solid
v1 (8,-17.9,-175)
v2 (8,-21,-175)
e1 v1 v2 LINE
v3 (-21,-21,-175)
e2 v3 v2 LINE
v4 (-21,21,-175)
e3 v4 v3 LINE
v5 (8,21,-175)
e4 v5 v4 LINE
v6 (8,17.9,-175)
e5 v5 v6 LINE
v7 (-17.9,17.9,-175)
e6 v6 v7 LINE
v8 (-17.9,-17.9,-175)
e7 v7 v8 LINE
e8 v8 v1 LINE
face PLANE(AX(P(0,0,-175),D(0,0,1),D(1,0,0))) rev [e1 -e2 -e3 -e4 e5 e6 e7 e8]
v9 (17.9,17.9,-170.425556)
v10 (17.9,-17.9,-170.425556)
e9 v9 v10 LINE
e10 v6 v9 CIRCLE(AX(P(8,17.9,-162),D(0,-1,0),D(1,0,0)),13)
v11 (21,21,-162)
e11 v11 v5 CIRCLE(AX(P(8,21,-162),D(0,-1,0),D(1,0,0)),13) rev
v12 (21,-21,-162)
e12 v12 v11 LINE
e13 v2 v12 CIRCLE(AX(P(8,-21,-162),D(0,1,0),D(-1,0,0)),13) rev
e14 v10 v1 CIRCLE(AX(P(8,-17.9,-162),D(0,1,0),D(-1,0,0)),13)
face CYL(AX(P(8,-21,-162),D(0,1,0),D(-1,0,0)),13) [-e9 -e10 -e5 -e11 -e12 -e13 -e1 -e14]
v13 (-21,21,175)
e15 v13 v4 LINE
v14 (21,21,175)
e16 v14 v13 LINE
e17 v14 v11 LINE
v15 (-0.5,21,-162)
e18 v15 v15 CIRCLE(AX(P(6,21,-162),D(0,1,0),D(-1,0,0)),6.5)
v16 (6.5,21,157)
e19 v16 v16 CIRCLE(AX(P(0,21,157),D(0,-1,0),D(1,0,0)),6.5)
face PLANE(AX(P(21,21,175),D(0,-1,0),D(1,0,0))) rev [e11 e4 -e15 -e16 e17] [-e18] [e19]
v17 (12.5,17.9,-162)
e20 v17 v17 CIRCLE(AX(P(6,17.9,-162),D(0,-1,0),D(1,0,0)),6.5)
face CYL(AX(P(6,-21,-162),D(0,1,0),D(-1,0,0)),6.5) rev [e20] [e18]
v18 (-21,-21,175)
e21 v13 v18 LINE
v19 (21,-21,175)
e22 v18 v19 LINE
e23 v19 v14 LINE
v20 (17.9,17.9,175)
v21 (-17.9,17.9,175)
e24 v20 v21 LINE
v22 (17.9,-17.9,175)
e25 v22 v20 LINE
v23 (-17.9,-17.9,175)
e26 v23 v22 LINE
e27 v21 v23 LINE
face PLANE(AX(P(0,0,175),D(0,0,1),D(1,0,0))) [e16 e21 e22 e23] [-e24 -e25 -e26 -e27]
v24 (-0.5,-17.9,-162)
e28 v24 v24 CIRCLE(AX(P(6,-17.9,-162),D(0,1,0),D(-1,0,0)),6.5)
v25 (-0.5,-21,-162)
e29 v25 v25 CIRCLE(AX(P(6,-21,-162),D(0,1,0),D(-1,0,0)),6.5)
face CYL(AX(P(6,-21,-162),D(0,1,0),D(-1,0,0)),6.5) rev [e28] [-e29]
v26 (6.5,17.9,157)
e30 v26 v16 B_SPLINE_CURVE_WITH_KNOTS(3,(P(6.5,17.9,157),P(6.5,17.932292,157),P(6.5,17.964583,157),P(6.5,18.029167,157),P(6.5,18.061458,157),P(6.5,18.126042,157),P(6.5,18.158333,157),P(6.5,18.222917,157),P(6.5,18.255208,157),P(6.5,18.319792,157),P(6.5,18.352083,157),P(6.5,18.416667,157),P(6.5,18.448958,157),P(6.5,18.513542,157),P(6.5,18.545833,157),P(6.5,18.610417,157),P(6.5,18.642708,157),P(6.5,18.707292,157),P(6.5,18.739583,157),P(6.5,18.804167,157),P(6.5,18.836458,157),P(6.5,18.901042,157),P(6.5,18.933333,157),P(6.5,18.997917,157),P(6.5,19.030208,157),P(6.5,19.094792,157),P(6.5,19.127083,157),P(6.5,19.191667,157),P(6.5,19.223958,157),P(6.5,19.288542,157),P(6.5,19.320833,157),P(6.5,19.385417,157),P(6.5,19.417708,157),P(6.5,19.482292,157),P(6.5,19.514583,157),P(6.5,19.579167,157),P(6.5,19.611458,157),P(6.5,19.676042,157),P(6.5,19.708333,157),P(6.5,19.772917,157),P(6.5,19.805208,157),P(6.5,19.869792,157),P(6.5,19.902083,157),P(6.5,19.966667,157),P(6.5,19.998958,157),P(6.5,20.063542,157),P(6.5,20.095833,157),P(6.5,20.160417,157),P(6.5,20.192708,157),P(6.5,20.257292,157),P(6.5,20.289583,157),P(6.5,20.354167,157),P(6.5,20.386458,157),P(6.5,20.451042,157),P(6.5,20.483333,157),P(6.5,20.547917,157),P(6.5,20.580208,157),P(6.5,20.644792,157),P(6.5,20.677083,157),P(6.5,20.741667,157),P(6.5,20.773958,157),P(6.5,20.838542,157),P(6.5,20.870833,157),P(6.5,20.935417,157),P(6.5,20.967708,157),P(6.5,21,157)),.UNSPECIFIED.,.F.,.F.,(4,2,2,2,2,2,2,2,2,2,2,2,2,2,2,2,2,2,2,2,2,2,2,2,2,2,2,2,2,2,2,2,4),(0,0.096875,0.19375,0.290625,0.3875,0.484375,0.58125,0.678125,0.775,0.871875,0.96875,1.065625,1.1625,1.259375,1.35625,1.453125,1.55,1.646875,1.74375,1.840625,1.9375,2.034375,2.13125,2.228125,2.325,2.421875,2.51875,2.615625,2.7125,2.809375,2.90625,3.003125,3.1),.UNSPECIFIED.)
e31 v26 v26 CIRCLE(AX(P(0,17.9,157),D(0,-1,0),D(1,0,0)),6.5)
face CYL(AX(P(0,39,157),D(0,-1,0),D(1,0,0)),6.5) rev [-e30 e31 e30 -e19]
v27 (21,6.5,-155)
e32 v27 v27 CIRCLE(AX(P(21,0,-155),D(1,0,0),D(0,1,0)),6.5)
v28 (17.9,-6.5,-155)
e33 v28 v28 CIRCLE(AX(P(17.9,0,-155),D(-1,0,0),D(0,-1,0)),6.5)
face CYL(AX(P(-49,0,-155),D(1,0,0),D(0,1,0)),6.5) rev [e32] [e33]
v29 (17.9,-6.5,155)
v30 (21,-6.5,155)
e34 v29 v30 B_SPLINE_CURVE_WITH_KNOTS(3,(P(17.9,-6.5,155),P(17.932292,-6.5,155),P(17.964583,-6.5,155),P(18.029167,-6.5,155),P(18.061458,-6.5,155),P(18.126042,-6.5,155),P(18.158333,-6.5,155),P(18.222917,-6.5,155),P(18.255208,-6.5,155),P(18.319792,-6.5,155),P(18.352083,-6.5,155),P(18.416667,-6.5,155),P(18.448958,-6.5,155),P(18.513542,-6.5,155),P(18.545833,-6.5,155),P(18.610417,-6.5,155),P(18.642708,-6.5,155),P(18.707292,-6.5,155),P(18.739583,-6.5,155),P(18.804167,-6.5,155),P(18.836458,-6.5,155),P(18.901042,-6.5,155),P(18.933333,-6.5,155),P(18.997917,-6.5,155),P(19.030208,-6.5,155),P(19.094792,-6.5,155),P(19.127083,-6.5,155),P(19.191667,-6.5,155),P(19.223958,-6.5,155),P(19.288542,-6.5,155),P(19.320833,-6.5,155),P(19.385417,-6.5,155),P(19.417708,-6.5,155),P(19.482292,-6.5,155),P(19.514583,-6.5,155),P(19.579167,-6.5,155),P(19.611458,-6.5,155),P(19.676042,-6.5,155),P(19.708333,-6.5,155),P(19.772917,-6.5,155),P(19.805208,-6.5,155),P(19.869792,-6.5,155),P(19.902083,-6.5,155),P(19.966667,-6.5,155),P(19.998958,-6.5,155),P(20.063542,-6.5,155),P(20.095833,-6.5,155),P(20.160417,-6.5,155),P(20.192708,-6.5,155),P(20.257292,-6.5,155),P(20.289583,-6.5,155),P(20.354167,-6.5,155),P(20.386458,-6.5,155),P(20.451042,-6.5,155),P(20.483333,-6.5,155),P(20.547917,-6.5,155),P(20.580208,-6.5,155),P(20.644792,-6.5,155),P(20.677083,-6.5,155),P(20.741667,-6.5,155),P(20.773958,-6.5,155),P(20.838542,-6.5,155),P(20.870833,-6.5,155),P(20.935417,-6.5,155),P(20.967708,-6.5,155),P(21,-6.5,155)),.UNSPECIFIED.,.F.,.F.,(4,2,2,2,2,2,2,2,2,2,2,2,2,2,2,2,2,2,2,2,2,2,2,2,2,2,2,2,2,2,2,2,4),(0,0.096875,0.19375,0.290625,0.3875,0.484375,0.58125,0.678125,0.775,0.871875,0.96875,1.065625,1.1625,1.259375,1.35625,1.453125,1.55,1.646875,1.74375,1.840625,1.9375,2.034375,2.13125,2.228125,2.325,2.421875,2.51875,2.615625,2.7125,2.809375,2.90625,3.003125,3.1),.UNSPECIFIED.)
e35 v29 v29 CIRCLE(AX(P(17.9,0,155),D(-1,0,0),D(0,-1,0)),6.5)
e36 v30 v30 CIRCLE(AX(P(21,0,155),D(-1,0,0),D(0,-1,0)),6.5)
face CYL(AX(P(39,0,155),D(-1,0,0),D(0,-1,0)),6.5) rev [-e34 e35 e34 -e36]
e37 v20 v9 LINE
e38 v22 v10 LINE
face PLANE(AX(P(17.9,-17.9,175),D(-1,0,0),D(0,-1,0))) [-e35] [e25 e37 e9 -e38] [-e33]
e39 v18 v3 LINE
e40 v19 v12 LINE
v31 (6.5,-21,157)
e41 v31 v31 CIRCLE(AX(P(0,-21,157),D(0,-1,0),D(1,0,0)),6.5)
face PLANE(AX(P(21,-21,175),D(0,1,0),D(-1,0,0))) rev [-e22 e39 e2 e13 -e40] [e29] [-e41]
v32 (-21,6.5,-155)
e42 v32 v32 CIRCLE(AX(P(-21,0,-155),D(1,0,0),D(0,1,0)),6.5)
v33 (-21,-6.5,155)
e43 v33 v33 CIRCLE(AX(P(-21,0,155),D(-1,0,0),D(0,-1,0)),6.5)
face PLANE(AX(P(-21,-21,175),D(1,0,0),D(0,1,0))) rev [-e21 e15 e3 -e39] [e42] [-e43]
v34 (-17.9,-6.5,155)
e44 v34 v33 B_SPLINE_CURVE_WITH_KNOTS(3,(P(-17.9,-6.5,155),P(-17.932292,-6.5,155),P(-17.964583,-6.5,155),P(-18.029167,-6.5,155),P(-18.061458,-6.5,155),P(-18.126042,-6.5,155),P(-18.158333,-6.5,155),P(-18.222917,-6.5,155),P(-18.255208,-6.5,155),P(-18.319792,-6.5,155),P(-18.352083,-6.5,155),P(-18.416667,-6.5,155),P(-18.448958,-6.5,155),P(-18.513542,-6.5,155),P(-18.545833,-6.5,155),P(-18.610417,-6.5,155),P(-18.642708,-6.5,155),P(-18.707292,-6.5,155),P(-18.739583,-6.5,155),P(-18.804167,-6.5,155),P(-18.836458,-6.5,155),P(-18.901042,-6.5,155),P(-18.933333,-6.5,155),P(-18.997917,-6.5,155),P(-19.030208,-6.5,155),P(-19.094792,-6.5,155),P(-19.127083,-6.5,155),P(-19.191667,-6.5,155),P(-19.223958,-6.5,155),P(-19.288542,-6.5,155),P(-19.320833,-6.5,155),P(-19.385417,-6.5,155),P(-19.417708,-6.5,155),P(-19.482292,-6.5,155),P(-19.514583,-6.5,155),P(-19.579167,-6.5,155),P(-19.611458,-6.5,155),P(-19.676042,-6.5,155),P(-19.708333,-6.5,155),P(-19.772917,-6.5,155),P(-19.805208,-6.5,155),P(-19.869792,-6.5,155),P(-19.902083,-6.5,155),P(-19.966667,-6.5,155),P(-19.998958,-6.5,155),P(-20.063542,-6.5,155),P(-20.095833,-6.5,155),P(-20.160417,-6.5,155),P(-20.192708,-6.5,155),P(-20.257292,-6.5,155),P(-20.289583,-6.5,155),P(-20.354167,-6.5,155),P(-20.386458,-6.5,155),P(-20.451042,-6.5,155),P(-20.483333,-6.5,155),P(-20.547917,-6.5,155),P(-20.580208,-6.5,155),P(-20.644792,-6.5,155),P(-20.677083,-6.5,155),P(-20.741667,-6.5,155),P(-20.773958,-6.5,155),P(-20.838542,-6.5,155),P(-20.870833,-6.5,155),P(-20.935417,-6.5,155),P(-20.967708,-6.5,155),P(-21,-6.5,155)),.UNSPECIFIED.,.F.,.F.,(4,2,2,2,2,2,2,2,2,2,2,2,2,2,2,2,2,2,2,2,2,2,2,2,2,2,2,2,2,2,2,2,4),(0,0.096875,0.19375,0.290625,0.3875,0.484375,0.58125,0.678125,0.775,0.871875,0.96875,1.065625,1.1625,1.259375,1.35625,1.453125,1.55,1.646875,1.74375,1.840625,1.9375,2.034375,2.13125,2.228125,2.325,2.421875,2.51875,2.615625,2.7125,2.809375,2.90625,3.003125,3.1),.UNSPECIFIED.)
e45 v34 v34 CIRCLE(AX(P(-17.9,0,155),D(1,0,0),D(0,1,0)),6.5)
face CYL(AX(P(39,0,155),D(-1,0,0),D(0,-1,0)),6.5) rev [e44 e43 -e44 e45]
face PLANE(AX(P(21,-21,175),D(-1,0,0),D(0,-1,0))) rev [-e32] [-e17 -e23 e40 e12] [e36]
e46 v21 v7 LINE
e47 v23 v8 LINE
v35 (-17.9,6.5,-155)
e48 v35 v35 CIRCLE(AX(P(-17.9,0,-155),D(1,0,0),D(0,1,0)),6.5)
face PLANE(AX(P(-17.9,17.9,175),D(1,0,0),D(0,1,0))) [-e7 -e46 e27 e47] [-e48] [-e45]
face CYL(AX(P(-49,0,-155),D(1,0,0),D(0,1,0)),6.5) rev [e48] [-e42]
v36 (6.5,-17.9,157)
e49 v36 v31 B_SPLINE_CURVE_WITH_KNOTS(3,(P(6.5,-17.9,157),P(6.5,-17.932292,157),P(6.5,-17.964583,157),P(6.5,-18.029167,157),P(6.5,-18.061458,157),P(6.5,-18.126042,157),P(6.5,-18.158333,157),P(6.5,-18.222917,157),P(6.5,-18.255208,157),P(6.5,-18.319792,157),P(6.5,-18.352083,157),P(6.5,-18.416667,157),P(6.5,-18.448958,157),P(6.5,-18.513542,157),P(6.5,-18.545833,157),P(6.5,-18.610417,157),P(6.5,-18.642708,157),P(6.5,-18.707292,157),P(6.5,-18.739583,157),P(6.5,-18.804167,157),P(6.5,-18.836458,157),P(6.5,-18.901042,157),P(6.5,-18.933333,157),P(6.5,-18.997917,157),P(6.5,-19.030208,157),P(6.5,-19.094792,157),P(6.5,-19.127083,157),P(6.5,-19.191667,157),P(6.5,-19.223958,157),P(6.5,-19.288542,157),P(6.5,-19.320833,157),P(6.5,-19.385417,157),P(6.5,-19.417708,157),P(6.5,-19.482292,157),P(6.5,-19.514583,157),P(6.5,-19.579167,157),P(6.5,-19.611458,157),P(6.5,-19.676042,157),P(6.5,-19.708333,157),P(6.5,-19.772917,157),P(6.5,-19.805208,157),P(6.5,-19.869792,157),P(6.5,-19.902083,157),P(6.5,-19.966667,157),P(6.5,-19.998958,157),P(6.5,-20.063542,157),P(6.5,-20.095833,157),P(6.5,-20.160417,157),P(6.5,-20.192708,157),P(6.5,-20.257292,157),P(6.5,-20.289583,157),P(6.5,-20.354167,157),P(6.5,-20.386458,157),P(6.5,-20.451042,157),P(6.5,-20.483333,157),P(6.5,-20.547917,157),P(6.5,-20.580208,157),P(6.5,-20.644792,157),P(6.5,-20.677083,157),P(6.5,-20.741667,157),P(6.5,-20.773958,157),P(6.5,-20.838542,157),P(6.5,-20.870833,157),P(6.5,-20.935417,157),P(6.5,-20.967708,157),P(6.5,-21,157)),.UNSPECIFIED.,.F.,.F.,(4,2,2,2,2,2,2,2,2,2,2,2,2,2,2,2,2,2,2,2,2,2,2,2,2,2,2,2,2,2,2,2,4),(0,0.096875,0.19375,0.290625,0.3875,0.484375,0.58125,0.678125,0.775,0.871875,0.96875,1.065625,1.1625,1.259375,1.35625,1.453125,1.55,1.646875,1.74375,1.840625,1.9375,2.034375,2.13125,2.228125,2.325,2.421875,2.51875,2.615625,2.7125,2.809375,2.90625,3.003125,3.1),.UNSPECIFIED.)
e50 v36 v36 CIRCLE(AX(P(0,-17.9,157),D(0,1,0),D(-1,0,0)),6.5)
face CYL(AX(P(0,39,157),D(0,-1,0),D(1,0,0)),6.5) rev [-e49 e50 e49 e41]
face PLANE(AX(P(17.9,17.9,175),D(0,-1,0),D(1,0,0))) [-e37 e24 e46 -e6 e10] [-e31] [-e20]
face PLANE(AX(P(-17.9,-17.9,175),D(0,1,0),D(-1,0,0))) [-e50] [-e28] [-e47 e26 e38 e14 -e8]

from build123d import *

# Parameters (mm, degrees)
CROQUIS1_W              = 42
CROQUIS1_H              = 42
SALIENTE_EXTRUIR1_DEPTH = 175
CORTAR_EXTRUIR1_DEPTH   = 355.297078735
CROQUIS3_R              = 6.5
CORTAR_EXTRUIR3_DEPTH   = 60
CROQUIS4_R              = 6.5
CORTAR_EXTRUIR4_DEPTH   = 70
CROQUIS5_R              = 6.5
CORTAR_EXTRUIR5_DEPTH   = 182.190507478
REDONDEO1_R             = 13
CROQUIS6_R              = 6.5
CORTAR_EXTRUIR6_DEPTH   = 60


with BuildPart() as part:
    # Croquis1 → Saliente-Extruir1 (new, symmetric)
    with BuildSketch(Plane.XY):
        Rectangle(CROQUIS1_W, CROQUIS1_H)
    extrude(amount=SALIENTE_EXTRUIR1_DEPTH, both=True)

    # Croquis3D1 → Cortar-Extruir1 (cut, through all)
    with BuildSketch(Plane(origin=(-17.9, -17.9, 175), x_dir=(0.7071067811865475, 0.7071067811865477, 0), z_dir=(0, 0, 1))):
        Polygon((0, 0), (25.314422766, -25.314422766), (50.628845533, 0), (25.314422766, 25.314422766), align=None)
    extrude(amount=-CORTAR_EXTRUIR1_DEPTH, mode=Mode.SUBTRACT)

    # Croquis3 → Cortar-Extruir3 (cut)
    with BuildSketch(Plane.XZ.offset(21)):
        with Locations((0, 157)):
            Circle(CROQUIS3_R)
    extrude(amount=-CORTAR_EXTRUIR3_DEPTH, mode=Mode.SUBTRACT)

    # Croquis4 → Cortar-Extruir4 (cut)
    with BuildSketch(Plane(origin=(21, 0, 0), x_dir=(0, 0, -1), z_dir=(1, 0, 0))):
        with Locations(Location((155, 0, 0), (0, 0, 90))):
            Circle(CROQUIS4_R)
    extrude(amount=-CORTAR_EXTRUIR4_DEPTH, mode=Mode.SUBTRACT)

    # Croquis5 → Cortar-Extruir5 (cut, through all)
    with BuildSketch(Plane(origin=(0, 21, 0), x_dir=(1, 0, 0), z_dir=(0, 1, 0))):
        with Locations(Location((6, 162, 0), (0, 0, 180))):
            Circle(CROQUIS5_R)
    extrude(amount=-CORTAR_EXTRUIR5_DEPTH, mode=Mode.SUBTRACT)

    # Redondeo1
    # the kernel refuses this fillet: 13 mm, written as the material it takes off along each edge
    with BuildSketch(Plane(origin=(21, 53.5, -175), x_dir=(0, 0, 1), z_dir=(0, -1, 0))) as redondeo1_piece_1:
        with BuildLine():
            CenterArc((REDONDEO1_R, REDONDEO1_R), REDONDEO1_R, 180, 90)
            Line((0, REDONDEO1_R), (0, 0))
            Line((0, 0), (REDONDEO1_R, 0))
        make_face()
    extrude(amount=107, mode=Mode.SUBTRACT)

    # Croquis6 → Cortar-Extruir6 (cut)
    with BuildSketch(Plane.ZY.offset(21)):
        with Locations(Location((155, 0, 0), (0, 0, 270))):
            Circle(CROQUIS6_R)
    extrude(amount=-CORTAR_EXTRUIR6_DEPTH, mode=Mode.SUBTRACT)


solid = part.part
